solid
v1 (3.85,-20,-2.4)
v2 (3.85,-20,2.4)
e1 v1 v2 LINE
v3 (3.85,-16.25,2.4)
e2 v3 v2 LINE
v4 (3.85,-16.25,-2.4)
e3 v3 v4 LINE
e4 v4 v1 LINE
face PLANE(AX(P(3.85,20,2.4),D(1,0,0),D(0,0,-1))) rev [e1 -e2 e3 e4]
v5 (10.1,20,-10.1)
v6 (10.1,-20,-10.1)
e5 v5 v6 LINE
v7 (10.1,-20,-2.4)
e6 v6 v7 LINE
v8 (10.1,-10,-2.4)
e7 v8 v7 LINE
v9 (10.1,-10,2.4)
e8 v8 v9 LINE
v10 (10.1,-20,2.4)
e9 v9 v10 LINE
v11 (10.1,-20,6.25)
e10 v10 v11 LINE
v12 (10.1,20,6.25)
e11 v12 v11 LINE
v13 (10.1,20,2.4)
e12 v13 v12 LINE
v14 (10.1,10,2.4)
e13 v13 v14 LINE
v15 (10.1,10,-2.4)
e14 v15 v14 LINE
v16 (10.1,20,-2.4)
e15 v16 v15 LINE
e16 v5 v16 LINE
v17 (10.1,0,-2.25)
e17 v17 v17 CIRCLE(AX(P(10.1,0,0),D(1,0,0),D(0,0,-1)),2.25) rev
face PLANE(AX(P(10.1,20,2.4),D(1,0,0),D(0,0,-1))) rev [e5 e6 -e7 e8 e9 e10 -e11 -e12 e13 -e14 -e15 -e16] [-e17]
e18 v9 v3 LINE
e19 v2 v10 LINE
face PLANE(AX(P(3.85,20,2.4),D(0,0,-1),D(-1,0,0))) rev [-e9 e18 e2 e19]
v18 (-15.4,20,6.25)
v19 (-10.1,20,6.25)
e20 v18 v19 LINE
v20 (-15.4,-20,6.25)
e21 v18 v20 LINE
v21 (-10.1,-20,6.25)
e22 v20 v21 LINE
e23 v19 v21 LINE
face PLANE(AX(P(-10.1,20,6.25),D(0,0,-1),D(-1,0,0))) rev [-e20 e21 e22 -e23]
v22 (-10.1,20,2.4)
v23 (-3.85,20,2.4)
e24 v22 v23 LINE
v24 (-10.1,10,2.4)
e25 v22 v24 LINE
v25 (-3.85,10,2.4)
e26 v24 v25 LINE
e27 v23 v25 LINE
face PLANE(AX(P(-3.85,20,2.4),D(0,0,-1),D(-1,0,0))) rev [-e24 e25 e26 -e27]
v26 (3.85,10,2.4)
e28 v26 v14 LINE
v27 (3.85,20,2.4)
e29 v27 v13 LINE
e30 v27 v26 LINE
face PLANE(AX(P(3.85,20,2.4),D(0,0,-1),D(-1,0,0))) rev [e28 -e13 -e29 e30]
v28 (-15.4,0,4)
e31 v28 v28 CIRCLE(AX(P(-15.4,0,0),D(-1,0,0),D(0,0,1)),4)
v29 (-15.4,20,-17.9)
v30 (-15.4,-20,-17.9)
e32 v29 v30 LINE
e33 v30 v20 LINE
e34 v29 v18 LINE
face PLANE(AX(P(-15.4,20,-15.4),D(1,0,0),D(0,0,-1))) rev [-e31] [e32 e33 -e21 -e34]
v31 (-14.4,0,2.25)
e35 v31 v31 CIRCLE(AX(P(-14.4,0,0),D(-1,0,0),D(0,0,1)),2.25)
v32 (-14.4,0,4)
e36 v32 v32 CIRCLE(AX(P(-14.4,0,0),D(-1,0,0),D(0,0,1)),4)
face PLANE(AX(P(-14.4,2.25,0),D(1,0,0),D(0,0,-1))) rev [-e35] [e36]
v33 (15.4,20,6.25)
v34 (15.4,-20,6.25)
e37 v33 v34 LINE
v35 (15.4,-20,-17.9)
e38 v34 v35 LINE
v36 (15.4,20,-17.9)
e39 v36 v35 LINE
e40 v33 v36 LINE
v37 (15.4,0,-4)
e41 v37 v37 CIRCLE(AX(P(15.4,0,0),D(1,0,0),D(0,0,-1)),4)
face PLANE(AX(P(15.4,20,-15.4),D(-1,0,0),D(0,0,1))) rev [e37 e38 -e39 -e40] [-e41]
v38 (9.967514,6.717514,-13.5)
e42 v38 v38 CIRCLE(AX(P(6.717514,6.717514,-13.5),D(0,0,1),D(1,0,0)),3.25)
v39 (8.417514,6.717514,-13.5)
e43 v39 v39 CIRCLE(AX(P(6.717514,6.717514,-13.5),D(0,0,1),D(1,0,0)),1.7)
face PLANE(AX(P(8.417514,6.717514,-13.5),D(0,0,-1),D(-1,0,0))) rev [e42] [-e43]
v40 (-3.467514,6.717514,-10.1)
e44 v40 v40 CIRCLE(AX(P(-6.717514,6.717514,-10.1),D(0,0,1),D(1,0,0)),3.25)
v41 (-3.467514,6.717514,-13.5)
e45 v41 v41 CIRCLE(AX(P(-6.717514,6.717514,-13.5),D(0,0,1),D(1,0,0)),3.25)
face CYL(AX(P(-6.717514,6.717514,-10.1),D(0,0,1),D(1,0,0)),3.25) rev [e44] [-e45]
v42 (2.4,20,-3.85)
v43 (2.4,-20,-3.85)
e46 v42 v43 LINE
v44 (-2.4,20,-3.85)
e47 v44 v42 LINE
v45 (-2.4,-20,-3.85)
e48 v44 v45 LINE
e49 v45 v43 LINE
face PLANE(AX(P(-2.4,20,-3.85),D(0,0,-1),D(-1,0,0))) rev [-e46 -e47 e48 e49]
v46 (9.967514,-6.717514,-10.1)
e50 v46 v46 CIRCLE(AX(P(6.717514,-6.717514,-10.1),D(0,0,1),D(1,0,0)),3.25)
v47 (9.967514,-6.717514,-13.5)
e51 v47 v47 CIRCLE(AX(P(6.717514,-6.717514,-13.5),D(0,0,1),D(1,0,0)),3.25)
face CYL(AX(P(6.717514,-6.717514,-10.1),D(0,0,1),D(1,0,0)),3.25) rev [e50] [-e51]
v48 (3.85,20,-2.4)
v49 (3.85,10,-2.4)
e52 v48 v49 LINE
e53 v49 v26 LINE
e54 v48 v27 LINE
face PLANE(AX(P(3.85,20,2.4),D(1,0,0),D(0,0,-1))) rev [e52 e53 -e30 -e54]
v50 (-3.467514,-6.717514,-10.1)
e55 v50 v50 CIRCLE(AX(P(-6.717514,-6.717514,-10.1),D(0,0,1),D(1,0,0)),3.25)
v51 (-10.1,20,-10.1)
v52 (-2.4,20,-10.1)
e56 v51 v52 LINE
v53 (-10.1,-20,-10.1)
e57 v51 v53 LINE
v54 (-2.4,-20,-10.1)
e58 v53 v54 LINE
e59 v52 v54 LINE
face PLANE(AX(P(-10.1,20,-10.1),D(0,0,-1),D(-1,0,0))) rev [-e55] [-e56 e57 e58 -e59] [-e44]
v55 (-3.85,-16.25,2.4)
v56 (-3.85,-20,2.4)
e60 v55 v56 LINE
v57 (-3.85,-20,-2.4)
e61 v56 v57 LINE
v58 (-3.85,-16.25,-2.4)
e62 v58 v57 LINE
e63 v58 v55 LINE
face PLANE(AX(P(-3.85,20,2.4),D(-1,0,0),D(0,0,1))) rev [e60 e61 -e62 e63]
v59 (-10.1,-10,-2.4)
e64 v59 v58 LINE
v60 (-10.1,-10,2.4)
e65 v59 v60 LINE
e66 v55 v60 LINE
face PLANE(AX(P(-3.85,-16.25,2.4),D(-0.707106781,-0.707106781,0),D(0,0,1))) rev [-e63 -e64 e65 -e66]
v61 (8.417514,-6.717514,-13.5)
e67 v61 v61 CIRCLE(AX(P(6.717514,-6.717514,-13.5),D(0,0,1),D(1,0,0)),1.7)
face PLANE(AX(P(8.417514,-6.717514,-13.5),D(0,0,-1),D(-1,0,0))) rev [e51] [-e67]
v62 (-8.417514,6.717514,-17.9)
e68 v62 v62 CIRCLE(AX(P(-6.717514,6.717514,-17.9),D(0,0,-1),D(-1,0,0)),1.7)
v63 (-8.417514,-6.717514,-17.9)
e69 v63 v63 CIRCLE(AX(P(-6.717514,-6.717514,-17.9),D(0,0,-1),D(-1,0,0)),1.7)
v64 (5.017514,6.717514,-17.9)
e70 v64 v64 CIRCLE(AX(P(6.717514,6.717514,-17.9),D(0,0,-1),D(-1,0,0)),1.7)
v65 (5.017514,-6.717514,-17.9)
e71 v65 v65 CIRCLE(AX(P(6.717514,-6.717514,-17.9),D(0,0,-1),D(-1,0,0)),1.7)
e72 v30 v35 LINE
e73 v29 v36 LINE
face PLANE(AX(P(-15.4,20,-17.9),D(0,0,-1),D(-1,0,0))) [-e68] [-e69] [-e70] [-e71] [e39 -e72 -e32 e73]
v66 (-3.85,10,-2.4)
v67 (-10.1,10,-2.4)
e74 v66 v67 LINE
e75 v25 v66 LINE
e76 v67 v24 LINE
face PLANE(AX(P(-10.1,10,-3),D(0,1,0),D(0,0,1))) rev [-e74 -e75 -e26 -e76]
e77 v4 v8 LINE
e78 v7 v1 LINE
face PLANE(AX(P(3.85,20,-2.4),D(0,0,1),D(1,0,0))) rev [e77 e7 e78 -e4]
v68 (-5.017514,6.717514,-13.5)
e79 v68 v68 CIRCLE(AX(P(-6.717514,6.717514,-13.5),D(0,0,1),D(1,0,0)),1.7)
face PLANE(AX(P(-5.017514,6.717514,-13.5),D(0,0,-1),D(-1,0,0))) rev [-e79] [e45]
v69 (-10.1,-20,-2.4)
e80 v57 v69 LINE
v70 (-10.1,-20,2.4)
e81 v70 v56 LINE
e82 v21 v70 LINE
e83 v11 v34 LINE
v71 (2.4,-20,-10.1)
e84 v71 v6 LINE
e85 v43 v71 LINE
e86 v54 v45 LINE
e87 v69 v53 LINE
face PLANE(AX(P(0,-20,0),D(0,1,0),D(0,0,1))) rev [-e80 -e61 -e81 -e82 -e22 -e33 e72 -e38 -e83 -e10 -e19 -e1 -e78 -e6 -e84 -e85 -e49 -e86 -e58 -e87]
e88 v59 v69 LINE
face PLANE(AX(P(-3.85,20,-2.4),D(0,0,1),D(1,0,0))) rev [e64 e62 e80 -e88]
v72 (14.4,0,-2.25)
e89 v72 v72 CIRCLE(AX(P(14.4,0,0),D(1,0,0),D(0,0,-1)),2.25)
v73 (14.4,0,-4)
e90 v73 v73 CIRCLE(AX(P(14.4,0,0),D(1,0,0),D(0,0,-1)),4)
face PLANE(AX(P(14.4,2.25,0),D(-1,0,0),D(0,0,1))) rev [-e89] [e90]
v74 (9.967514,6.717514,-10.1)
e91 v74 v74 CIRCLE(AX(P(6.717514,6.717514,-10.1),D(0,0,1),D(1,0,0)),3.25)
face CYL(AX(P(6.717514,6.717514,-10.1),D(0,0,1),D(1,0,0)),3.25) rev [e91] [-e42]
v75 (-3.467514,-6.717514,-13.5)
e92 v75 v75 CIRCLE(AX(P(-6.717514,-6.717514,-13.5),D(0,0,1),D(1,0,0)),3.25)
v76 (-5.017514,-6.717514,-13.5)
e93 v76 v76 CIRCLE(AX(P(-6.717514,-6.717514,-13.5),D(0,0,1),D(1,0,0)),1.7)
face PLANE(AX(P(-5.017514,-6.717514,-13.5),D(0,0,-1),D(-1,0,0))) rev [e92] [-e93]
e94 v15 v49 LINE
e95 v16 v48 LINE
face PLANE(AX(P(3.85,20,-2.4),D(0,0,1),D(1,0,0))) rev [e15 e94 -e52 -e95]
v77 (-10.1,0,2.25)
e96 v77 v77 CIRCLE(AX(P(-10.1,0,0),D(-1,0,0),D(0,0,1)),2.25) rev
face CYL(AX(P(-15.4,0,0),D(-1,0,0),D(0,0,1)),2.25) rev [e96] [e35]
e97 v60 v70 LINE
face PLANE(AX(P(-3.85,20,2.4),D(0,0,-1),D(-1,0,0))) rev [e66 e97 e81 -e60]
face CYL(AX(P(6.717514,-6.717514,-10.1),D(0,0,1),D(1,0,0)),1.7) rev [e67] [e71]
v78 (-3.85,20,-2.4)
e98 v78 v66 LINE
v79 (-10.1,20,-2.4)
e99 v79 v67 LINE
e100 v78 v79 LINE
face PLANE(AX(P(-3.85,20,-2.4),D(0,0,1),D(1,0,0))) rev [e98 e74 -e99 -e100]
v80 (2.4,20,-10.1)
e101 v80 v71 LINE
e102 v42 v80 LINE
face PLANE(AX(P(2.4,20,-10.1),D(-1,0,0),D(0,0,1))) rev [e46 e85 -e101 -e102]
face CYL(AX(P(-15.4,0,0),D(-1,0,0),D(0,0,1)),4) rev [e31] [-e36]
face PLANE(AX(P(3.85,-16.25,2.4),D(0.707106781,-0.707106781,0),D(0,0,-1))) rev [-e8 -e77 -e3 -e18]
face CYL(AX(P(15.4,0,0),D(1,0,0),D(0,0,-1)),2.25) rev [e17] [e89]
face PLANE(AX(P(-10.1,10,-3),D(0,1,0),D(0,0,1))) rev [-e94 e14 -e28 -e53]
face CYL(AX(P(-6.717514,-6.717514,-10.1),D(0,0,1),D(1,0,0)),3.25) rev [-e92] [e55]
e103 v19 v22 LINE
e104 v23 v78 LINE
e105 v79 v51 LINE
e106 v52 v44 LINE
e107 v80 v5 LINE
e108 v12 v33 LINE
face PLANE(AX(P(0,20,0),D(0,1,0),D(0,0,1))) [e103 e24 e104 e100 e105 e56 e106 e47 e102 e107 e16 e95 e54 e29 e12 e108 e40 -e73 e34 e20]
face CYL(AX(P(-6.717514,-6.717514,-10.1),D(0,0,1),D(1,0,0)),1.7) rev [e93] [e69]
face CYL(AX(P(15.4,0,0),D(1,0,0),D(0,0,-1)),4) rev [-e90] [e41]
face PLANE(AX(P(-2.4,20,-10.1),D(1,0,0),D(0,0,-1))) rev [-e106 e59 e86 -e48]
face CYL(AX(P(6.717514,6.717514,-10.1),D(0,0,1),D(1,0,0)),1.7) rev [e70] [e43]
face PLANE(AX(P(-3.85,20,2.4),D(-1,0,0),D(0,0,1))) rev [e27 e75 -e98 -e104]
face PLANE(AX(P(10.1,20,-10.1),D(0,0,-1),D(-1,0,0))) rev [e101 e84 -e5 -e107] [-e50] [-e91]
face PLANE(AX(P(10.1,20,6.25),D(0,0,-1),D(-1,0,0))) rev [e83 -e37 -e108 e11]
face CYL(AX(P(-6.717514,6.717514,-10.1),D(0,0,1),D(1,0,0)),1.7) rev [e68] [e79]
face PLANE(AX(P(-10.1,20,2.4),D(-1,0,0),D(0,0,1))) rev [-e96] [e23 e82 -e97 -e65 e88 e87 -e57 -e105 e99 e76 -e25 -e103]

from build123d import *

# Parameters (mm, degrees)
BOSS_EXTRU_1_DEPTH                                = 20
CHAMBRAGE_POUR_VIS_SIX_PANS_CREUX_M41_D           = 4.5
CHAMBRAGE_POUR_VIS_SIX_PANS_CREUX_M41_DEPTH       = 11.55
CHAMBRAGE_POUR_VIS_SIX_PANS_CREUX_M41_CBORE_D     = 8
CHAMBRAGE_POUR_VIS_SIX_PANS_CREUX_M41_CBORE_DEPTH = 1
ESQUISSE6_W                                       = 20.2
ESQUISSE6_H                                       = 20
ENL_V_MAT_EXTRU_1_DEPTH                           = 3
ESQUISSE14_W                                      = 30.8
ESQUISSE14_H                                      = 2.5
BOSS_EXTRU_3_DEPTH                                = 40
CHAMBRAGE_POUR_VIS_SIX_PANS_CREUX_M31_D           = 3.4
CHAMBRAGE_POUR_VIS_SIX_PANS_CREUX_M31_CBORE_D     = 6.5
CHAMBRAGE_POUR_VIS_SIX_PANS_CREUX_M31_CBORE_DEPTH = 3.4
CHANFREIN1_SIZE                                   = 6.25


with BuildPart() as part:
    # Base → Boss.-Extru.1 (new, symmetric)
    with BuildSketch(Plane(origin=(0, 0, 0), x_dir=(1, 0, 0), z_dir=(0, 1, 0))):
        Polygon((-3.85, -2.4), (-3.85, 2.4), (-10.1, 2.4), (-10.1, 10.1), (-2.4, 10.1), (-2.4, 3.85), (2.4, 3.85), (2.4, 10.1), (10.1, 10.1), (10.1, 2.4), (3.85, 2.4), (3.85, -2.4), (10.1, -2.4), (10.1, -6.25), (15.4, -6.25), (15.4, 15.4), (-15.4, 15.4), (-15.4, -6.25), (-10.1, -6.25), (-10.1, -2.4), align=None)
    extrude(amount=BOSS_EXTRU_1_DEPTH, both=True)

    # Chambrage pour vis à six pans creux M41
    with Locations(Plane(origin=(15.4, 0, 0), x_dir=(0, 0, -1), z_dir=(1, 0, 0))):
        with Locations((0, 0)):
            chambrage_pour_vis_six_pans_creux_m41 = CounterBoreHole(CHAMBRAGE_POUR_VIS_SIX_PANS_CREUX_M41_D / 2, CHAMBRAGE_POUR_VIS_SIX_PANS_CREUX_M41_CBORE_D / 2, CHAMBRAGE_POUR_VIS_SIX_PANS_CREUX_M41_CBORE_DEPTH, depth=CHAMBRAGE_POUR_VIS_SIX_PANS_CREUX_M41_DEPTH)

    # Symétrie1: Chambrage pour vis à six pans creux M41 across plane
    add(chambrage_pour_vis_six_pans_creux_m41.mirror(Plane(origin=(0, 0, 0), x_dir=(0, 0, 1), z_dir=(1, 0, 0))), mode=Mode.SUBTRACT)

    # Esquisse6 → Enlèv. mat.-Extru.1 (cut, symmetric)
    with BuildSketch(Plane.XY):
        Rectangle(ESQUISSE6_W, ESQUISSE6_H)
    extrude(amount=ENL_V_MAT_EXTRU_1_DEPTH, both=True, mode=Mode.SUBTRACT)

    # Esquisse14 → Boss.-Extru.3 (add)
    with BuildSketch(Plane.XZ.offset(20)):
        with Locations((0, -16.65)):
            Rectangle(ESQUISSE14_W, ESQUISSE14_H)
    extrude(amount=-BOSS_EXTRU_3_DEPTH)

    # Chambrage pour vis à six pans creux M31 (through all)
    with Locations(Plane.XY.offset(-10.1)):
        with Locations((-6.717514421, 6.717514421), (-6.717514421, -6.717514421), (6.717514421, 6.717514421), (6.717514421, -6.717514421)):
            CounterBoreHole(CHAMBRAGE_POUR_VIS_SIX_PANS_CREUX_M31_D / 2, CHAMBRAGE_POUR_VIS_SIX_PANS_CREUX_M31_CBORE_D / 2, CHAMBRAGE_POUR_VIS_SIX_PANS_CREUX_M31_CBORE_DEPTH)

    # Chanfrein1
    chanfrein1_edges = [part.edges().sort_by_distance(p)[0] for p in [
        (3.85, -10, 0),
        (-3.85, -10, 0),
    ]]
    chamfer(chanfrein1_edges, length=CHANFREIN1_SIZE - 0.0001)  # a hair under: the kernel refuses the full size


solid = part.part
